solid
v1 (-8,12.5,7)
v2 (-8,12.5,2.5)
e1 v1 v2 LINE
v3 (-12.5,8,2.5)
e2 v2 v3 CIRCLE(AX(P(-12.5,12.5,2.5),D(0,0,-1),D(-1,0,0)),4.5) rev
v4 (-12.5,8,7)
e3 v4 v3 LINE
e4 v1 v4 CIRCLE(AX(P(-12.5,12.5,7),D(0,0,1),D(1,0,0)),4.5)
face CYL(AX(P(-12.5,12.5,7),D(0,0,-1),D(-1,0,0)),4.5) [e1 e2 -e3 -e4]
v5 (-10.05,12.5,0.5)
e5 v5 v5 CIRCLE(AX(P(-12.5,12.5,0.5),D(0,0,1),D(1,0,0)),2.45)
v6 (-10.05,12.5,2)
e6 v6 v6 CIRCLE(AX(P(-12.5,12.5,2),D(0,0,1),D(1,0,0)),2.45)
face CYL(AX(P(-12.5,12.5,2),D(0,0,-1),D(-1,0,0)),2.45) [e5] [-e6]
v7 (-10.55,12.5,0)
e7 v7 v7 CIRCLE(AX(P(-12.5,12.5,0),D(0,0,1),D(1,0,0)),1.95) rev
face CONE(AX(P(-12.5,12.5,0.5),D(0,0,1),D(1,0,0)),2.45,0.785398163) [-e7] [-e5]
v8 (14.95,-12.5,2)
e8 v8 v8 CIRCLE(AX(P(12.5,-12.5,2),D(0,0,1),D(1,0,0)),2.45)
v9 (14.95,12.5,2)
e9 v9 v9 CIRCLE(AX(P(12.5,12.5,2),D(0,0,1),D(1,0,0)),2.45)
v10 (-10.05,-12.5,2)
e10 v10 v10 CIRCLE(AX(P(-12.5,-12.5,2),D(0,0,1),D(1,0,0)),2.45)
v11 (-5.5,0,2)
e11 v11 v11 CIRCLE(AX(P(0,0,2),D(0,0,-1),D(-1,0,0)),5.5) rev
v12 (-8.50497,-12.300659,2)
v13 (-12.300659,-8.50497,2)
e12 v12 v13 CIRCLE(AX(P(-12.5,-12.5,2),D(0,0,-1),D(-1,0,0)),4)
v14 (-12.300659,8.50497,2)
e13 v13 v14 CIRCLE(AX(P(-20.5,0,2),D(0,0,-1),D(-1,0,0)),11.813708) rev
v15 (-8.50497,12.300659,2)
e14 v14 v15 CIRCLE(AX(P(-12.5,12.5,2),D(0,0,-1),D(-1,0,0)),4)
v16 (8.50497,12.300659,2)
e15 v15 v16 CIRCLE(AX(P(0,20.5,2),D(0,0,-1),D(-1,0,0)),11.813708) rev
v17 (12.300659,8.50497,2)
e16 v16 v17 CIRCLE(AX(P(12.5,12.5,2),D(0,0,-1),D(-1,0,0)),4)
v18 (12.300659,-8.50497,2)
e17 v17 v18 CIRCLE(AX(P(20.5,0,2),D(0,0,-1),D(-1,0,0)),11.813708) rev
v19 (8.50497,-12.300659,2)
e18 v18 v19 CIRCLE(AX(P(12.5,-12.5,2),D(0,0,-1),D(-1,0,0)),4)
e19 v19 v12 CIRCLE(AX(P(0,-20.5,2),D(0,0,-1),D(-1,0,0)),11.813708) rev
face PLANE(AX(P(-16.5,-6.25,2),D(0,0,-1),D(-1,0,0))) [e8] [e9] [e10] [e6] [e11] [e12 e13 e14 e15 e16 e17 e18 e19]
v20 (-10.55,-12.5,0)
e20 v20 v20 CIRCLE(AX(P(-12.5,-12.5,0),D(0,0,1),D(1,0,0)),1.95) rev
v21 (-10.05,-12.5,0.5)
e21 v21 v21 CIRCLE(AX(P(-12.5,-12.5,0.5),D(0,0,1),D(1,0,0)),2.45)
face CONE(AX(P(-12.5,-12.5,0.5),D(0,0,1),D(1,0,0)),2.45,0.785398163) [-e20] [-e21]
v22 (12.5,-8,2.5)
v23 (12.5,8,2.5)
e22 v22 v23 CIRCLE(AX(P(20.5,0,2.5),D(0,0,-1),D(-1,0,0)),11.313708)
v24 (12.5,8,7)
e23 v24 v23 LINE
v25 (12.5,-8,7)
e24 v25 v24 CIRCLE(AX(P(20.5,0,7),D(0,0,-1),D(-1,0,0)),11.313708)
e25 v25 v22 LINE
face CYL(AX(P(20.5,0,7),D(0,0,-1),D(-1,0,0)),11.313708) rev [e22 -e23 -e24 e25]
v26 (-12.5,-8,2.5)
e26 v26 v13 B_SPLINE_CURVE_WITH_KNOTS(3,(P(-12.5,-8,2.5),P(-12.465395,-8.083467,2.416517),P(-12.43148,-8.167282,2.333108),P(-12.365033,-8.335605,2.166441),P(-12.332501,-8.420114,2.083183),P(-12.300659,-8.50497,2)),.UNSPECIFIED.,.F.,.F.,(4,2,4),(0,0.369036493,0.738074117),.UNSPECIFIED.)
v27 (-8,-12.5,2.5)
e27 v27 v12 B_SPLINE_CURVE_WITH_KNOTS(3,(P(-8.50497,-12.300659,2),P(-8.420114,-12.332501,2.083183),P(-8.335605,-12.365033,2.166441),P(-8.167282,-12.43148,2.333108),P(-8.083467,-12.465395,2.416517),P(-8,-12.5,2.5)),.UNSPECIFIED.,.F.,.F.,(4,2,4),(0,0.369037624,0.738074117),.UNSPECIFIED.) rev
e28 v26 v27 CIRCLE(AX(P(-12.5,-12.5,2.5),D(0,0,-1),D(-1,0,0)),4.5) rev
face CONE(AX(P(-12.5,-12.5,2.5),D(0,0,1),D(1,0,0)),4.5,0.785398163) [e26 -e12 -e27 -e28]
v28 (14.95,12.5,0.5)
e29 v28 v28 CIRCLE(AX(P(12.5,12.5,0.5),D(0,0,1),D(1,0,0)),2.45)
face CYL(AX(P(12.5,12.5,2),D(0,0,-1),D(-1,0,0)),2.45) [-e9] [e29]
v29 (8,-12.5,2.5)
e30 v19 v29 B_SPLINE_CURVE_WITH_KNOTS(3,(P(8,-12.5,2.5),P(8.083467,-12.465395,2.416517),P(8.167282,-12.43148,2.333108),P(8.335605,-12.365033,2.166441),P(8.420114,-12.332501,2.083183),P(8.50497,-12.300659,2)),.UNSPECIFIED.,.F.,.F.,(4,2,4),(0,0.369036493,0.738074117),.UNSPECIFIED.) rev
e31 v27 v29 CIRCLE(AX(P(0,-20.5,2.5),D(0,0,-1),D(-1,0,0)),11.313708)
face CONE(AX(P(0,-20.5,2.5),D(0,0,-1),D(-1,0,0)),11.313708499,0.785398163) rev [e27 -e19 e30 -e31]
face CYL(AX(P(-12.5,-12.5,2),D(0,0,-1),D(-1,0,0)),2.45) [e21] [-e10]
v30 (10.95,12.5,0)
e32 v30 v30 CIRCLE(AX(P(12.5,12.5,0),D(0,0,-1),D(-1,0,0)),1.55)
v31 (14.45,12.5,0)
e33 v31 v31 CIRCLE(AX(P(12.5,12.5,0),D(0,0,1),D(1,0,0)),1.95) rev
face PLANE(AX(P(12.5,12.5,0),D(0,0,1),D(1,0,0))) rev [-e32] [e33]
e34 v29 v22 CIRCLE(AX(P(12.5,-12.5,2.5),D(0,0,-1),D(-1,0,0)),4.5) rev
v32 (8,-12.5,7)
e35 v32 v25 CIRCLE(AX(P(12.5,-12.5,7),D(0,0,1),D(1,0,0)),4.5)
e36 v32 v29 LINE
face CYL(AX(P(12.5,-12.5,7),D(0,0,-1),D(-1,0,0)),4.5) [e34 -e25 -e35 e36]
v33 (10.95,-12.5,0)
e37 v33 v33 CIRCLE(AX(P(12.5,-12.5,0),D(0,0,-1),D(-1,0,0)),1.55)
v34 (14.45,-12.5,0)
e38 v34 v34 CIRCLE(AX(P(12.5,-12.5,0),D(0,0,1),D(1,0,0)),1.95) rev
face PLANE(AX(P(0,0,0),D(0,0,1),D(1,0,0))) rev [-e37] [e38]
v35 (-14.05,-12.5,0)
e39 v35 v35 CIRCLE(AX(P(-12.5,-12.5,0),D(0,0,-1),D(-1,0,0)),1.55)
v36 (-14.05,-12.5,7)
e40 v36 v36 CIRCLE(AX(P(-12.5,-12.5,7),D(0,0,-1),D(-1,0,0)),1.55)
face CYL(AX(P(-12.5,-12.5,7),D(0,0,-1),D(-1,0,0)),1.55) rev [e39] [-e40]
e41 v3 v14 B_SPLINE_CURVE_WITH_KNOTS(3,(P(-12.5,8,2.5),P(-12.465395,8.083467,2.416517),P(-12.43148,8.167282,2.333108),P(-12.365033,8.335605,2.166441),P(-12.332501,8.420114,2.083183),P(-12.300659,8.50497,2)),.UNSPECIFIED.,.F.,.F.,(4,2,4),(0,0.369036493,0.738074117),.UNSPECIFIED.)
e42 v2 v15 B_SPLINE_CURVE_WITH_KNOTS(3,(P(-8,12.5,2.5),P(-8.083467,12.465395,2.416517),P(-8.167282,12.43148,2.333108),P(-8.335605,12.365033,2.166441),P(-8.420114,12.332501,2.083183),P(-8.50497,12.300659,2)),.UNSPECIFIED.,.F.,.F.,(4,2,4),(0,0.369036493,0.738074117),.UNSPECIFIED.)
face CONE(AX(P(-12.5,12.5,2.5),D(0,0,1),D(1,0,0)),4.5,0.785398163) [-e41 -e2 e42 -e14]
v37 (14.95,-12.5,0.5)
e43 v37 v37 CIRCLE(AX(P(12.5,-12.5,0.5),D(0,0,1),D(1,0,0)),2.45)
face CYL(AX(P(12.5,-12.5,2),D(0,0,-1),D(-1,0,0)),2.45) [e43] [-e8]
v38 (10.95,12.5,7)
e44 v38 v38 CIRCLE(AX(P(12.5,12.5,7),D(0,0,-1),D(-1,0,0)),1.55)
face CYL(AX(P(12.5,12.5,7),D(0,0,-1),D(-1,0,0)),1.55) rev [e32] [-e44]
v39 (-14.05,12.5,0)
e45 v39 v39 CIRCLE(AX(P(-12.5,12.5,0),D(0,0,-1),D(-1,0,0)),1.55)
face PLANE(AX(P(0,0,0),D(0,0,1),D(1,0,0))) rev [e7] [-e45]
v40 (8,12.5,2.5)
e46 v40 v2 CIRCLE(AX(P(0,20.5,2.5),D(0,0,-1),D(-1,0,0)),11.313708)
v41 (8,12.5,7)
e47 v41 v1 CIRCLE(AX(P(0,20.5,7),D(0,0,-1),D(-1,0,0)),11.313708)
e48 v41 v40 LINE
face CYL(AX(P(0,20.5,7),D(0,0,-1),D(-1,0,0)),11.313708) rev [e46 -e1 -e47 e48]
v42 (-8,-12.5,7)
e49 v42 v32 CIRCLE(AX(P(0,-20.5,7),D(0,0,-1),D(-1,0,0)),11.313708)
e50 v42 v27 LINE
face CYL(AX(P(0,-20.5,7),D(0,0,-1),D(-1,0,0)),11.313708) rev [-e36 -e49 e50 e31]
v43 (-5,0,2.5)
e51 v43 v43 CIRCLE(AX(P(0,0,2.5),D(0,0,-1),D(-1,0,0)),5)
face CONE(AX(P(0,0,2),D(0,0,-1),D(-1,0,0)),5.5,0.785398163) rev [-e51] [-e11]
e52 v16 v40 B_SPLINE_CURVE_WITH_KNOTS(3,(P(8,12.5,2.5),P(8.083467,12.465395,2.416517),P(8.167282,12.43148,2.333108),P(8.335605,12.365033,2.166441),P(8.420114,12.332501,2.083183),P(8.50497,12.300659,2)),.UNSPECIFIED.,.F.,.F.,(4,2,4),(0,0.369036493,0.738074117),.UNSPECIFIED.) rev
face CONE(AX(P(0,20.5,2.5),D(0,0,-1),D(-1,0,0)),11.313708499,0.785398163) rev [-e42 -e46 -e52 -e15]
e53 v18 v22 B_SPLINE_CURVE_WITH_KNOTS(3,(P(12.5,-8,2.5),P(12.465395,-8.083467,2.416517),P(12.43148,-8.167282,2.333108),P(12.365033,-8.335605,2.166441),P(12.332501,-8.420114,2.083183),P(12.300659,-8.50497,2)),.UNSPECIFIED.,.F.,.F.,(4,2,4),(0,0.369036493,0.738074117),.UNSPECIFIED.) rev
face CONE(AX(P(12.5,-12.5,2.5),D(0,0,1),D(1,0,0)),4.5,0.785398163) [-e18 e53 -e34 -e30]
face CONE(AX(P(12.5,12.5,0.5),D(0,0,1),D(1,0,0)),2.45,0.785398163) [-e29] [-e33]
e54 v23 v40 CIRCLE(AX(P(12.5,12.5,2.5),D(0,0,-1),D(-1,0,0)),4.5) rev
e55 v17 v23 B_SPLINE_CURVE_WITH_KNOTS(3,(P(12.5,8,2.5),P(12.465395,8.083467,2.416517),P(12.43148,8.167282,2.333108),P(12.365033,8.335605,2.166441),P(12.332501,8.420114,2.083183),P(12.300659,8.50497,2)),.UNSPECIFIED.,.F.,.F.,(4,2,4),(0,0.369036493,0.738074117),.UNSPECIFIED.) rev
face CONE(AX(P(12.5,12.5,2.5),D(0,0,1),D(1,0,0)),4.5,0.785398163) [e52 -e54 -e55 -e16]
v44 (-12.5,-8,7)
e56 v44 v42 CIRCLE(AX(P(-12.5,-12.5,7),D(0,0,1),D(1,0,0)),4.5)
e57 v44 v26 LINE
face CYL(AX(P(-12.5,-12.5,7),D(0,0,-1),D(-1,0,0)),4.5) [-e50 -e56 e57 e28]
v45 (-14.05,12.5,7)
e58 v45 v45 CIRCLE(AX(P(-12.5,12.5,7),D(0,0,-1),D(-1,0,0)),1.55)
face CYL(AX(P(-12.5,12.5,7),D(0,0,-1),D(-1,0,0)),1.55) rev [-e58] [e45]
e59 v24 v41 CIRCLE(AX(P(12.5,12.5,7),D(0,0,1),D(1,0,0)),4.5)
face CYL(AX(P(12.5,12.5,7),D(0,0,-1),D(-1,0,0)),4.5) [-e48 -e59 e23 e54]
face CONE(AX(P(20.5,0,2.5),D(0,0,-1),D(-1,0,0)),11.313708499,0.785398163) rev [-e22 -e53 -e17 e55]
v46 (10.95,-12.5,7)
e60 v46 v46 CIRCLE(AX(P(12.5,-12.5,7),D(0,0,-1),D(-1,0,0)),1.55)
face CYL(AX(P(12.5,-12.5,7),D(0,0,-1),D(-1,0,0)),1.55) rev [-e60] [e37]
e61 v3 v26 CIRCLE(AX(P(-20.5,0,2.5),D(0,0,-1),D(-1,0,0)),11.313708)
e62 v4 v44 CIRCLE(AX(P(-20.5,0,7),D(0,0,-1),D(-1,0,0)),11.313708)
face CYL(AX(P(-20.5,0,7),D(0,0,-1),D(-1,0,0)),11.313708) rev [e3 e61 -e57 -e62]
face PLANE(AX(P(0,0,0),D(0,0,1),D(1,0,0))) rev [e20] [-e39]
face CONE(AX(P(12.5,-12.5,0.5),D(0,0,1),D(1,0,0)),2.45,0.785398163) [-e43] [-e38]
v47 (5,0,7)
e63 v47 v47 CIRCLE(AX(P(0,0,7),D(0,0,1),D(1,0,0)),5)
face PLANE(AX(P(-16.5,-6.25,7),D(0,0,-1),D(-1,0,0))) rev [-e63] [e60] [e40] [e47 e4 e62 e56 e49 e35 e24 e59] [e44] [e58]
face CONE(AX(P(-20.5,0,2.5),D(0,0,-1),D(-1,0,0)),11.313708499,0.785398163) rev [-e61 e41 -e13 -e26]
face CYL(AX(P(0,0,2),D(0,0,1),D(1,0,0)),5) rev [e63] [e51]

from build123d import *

# Parameters (mm, degrees)
CROQUIS1_R              = 2.4500000000000015
SALIENTE_EXTRUIR1_DEPTH = 2
SALIENTE_EXTRUIR2_DEPTH = 5
CROQUIS3_R              = 1.5499999999999992
CORTAR_EXTRUIR1_DEPTH   = 26.03996805109803
CROQUIS4_R              = 5
CORTAR_EXTRUIR2_DEPTH   = 5
CHAFL_N1_SIZE           = 0.5
CHAFL_N2_SIZE           = 0.5


with BuildPart() as part:
    # Croquis1 → Saliente-Extruir1 (new body)
    with BuildSketch(Plane.XY):
        with BuildLine():
            ThreePointArc((-10.049999999999738, -12.5), (-10.76758838609276, -10.767588386092894), (-12.499999999999918, -10.049999999999999))
            Line((-12.499999999999996, -10.049999999999997), (-12.499999999999996, -12.5))
            Line((-12.499999999999996, -12.5), (-10.049999999999738, -12.5))
        make_face()
        with BuildLine():
            Line((-12.499999999999996, -12.5), (-12.499999999999996, -10.049999999999997))
            ThreePointArc((-12.499999999999918, -10.049999999999999), (-14.232411613906718, -14.232411613907106), (-10.049999999999738, -12.5))
            Line((-10.049999999999738, -12.5), (-12.499999999999996, -12.5))
        make_face()
        with BuildLine():
            ThreePointArc((14.950000000000262, -12.5), (14.23241161390724, -10.767588386092894), (12.500000000000082, -10.049999999999999))
            Line((12.500000000000004, -10.05), (12.500000000000004, -12.499999999999996))
            Line((12.500000000000004, -12.499999999999996), (10.05000000000026, -12.499999999999996))
            ThreePointArc((10.05000000000026, -12.5), (12.500000000000261, -14.950000000000001), (14.950000000000262, -12.5))
        make_face()
        with BuildLine():
            Line((12.500000000000004, -12.499999999999996), (12.500000000000004, -10.05))
            ThreePointArc((12.500000000000082, -10.049999999999999), (10.767588386093156, -10.76758838609302), (10.05000000000026, -12.5))
            Line((10.05000000000026, -12.499999999999996), (12.500000000000004, -12.499999999999996))
        make_face()
        with BuildLine():
            ThreePointArc((-12.499999999999922, 10.049999999999999), (-10.76758838609293, 10.767588386092985), (-10.049999999999999, 12.5))
            Line((-10.049999999999997, 12.5), (-12.5, 12.5))
            Line((-12.5, 12.5), (-12.5, 10.049999999999999))
        make_face()
        with BuildLine():
            Line((-12.5, 12.5), (-10.049999999999997, 12.5))
            ThreePointArc((-10.049999999999999, 12.5), (-14.23241161390707, 14.232411613907015), (-12.499999999999922, 10.049999999999999))
            Line((-12.5, 10.049999999999999), (-12.5, 12.5))
        make_face()
        with Locations((12.5, 12.5)):
            Circle(CROQUIS1_R)
    extrude(amount=SALIENTE_EXTRUIR1_DEPTH)

    # Croquis2 → Saliente-Extruir2 (add)
    with BuildSketch(Plane.XY.offset(2)):
        with BuildLine():
            ThreePointArc((-7.999999999999958, 12.499999999999764), (-15.68198051533941, 15.681980515339577), (-12.5, 8))
            ThreePointArc((-12.5, 8), (-9.186291501015104, 5.367e-14), (-12.499999999999739, -8))
            ThreePointArc((-12.499999999999739, -8), (-15.681980515339163, -15.681980515339504), (-7.999999999999414, -12.499999999999883))
            ThreePointArc((-7.999999999999414, -12.499999999999883), (3.2112e-13, -9.18629150101557), (8.000000000000586, -12.499999999999618))
            ThreePointArc((8.000000000000586, -12.499999999999618), (15.681980515339447, -15.681980515339283), (12.500000000000016, -8.000000000000036))
            ThreePointArc((12.500000000000016, -8.000000000000036), (9.186291501015239, -2.647e-14), (12.50000000000002, 7.999999999999989))
            ThreePointArc((12.50000000000002, 7.999999999999989), (15.681980515339454, 15.68198051533949), (8.000000000000043, 12.49999999999997))
            ThreePointArc((8.000000000000043, 12.49999999999997), (8.613e-14, 9.1862915010151), (-7.999999999999958, 12.499999999999764))
        make_face()
    extrude(amount=SALIENTE_EXTRUIR2_DEPTH)

    # Croquis3 → Cortar-Extruir1 (cut, through all)
    with BuildSketch(Plane(origin=(0, 0, 0), x_dir=(-1, 0, 0), z_dir=(0, 0, -1))):
        with Locations((-12.500000000000261, -12.5)):
            Circle(CROQUIS3_R)
        with Locations((12.49999999999974, -12.5)):
            Circle(CROQUIS3_R)
        with Locations((12.499999999999654, 12.5)):
            Circle(CROQUIS3_R)
        with Locations((-12.500000000000348, 12.5)):
            Circle(CROQUIS3_R)
    extrude(amount=-CORTAR_EXTRUIR1_DEPTH, mode=Mode.SUBTRACT)

    # Croquis4 → Cortar-Extruir2 (cut)
    with BuildSketch(Plane.XY.offset(7)):
        Circle(CROQUIS4_R)
    extrude(amount=-CORTAR_EXTRUIR2_DEPTH, mode=Mode.SUBTRACT)

    # Chaflán1
    chafl_n1_edges = [part.edges().sort_by_distance(p)[0] for p in [
        (10.050000000000264, -12.5, 0),
        (-14.949999999999736, -12.5, 0),
        (-12.500000000000078, 14.950000000000001, 0),
        (10.049999999999999, 12.5, 0),
    ]]
    chamfer(chafl_n1_edges, length=CHAFL_N1_SIZE)

    # Chaflán2
    chafl_n2_edges = [part.edges().sort_by_distance(p)[0] for p in [
        (-15.681980515339374, 15.68198051533961, 2),
    ]]
    chamfer(chafl_n2_edges, length=CHAFL_N2_SIZE)
    chafl_n2_2_edges = [part.edges().sort_by_distance(p)[0] for p in [
        (8.438e-14, 9.186291501015104, 2),
    ]]
    chamfer(chafl_n2_2_edges, length=CHAFL_N2_SIZE)
    chafl_n2_3_edges = [part.edges().sort_by_distance(p)[0] for p in [
        (-9.186291501015104, 5.44e-14, 2),
    ]]
    chamfer(chafl_n2_3_edges, length=CHAFL_N2_SIZE)
    chafl_n2_4_edges = [part.edges().sort_by_distance(p)[0] for p in [
        (15.681980515339504, 15.681980515339442, 2),
    ]]
    chamfer(chafl_n2_4_edges, length=CHAFL_N2_SIZE - 0.0001)  # a hair under: the kernel refuses the full size
    chafl_n2_5_edges = [part.edges().sort_by_distance(p)[0] for p in [
        (-15.681980515338884, -15.68198051533978, 2),
    ]]
    chamfer(chafl_n2_5_edges, length=CHAFL_N2_SIZE)
    chafl_n2_6_edges = [part.edges().sort_by_distance(p)[0] for p in [
        (9.186291501015239, -2.132e-14, 2),
    ]]
    chamfer(chafl_n2_6_edges, length=CHAFL_N2_SIZE - 0.0001)  # a hair under: the kernel refuses the full size
    chafl_n2_7_edges = [part.edges().sort_by_distance(p)[0] for p in [
        (5.318e-13, -9.18629150101557, 2),
    ]]
    chamfer(chafl_n2_7_edges, length=CHAFL_N2_SIZE)
    chafl_n2_8_edges = [part.edges().sort_by_distance(p)[0] for p in [
        (15.681980515339694, -15.681980515339037, 2),
    ]]
    chamfer(chafl_n2_8_edges, length=CHAFL_N2_SIZE - 0.0004)  # a hair under: the kernel refuses the full size
    chafl_n2_9_edges = [part.edges().sort_by_distance(p)[0] for p in [
        (-5, 6.1e-16, 2),
    ]]
    chamfer(chafl_n2_9_edges, length=CHAFL_N2_SIZE)


solid = part.part
